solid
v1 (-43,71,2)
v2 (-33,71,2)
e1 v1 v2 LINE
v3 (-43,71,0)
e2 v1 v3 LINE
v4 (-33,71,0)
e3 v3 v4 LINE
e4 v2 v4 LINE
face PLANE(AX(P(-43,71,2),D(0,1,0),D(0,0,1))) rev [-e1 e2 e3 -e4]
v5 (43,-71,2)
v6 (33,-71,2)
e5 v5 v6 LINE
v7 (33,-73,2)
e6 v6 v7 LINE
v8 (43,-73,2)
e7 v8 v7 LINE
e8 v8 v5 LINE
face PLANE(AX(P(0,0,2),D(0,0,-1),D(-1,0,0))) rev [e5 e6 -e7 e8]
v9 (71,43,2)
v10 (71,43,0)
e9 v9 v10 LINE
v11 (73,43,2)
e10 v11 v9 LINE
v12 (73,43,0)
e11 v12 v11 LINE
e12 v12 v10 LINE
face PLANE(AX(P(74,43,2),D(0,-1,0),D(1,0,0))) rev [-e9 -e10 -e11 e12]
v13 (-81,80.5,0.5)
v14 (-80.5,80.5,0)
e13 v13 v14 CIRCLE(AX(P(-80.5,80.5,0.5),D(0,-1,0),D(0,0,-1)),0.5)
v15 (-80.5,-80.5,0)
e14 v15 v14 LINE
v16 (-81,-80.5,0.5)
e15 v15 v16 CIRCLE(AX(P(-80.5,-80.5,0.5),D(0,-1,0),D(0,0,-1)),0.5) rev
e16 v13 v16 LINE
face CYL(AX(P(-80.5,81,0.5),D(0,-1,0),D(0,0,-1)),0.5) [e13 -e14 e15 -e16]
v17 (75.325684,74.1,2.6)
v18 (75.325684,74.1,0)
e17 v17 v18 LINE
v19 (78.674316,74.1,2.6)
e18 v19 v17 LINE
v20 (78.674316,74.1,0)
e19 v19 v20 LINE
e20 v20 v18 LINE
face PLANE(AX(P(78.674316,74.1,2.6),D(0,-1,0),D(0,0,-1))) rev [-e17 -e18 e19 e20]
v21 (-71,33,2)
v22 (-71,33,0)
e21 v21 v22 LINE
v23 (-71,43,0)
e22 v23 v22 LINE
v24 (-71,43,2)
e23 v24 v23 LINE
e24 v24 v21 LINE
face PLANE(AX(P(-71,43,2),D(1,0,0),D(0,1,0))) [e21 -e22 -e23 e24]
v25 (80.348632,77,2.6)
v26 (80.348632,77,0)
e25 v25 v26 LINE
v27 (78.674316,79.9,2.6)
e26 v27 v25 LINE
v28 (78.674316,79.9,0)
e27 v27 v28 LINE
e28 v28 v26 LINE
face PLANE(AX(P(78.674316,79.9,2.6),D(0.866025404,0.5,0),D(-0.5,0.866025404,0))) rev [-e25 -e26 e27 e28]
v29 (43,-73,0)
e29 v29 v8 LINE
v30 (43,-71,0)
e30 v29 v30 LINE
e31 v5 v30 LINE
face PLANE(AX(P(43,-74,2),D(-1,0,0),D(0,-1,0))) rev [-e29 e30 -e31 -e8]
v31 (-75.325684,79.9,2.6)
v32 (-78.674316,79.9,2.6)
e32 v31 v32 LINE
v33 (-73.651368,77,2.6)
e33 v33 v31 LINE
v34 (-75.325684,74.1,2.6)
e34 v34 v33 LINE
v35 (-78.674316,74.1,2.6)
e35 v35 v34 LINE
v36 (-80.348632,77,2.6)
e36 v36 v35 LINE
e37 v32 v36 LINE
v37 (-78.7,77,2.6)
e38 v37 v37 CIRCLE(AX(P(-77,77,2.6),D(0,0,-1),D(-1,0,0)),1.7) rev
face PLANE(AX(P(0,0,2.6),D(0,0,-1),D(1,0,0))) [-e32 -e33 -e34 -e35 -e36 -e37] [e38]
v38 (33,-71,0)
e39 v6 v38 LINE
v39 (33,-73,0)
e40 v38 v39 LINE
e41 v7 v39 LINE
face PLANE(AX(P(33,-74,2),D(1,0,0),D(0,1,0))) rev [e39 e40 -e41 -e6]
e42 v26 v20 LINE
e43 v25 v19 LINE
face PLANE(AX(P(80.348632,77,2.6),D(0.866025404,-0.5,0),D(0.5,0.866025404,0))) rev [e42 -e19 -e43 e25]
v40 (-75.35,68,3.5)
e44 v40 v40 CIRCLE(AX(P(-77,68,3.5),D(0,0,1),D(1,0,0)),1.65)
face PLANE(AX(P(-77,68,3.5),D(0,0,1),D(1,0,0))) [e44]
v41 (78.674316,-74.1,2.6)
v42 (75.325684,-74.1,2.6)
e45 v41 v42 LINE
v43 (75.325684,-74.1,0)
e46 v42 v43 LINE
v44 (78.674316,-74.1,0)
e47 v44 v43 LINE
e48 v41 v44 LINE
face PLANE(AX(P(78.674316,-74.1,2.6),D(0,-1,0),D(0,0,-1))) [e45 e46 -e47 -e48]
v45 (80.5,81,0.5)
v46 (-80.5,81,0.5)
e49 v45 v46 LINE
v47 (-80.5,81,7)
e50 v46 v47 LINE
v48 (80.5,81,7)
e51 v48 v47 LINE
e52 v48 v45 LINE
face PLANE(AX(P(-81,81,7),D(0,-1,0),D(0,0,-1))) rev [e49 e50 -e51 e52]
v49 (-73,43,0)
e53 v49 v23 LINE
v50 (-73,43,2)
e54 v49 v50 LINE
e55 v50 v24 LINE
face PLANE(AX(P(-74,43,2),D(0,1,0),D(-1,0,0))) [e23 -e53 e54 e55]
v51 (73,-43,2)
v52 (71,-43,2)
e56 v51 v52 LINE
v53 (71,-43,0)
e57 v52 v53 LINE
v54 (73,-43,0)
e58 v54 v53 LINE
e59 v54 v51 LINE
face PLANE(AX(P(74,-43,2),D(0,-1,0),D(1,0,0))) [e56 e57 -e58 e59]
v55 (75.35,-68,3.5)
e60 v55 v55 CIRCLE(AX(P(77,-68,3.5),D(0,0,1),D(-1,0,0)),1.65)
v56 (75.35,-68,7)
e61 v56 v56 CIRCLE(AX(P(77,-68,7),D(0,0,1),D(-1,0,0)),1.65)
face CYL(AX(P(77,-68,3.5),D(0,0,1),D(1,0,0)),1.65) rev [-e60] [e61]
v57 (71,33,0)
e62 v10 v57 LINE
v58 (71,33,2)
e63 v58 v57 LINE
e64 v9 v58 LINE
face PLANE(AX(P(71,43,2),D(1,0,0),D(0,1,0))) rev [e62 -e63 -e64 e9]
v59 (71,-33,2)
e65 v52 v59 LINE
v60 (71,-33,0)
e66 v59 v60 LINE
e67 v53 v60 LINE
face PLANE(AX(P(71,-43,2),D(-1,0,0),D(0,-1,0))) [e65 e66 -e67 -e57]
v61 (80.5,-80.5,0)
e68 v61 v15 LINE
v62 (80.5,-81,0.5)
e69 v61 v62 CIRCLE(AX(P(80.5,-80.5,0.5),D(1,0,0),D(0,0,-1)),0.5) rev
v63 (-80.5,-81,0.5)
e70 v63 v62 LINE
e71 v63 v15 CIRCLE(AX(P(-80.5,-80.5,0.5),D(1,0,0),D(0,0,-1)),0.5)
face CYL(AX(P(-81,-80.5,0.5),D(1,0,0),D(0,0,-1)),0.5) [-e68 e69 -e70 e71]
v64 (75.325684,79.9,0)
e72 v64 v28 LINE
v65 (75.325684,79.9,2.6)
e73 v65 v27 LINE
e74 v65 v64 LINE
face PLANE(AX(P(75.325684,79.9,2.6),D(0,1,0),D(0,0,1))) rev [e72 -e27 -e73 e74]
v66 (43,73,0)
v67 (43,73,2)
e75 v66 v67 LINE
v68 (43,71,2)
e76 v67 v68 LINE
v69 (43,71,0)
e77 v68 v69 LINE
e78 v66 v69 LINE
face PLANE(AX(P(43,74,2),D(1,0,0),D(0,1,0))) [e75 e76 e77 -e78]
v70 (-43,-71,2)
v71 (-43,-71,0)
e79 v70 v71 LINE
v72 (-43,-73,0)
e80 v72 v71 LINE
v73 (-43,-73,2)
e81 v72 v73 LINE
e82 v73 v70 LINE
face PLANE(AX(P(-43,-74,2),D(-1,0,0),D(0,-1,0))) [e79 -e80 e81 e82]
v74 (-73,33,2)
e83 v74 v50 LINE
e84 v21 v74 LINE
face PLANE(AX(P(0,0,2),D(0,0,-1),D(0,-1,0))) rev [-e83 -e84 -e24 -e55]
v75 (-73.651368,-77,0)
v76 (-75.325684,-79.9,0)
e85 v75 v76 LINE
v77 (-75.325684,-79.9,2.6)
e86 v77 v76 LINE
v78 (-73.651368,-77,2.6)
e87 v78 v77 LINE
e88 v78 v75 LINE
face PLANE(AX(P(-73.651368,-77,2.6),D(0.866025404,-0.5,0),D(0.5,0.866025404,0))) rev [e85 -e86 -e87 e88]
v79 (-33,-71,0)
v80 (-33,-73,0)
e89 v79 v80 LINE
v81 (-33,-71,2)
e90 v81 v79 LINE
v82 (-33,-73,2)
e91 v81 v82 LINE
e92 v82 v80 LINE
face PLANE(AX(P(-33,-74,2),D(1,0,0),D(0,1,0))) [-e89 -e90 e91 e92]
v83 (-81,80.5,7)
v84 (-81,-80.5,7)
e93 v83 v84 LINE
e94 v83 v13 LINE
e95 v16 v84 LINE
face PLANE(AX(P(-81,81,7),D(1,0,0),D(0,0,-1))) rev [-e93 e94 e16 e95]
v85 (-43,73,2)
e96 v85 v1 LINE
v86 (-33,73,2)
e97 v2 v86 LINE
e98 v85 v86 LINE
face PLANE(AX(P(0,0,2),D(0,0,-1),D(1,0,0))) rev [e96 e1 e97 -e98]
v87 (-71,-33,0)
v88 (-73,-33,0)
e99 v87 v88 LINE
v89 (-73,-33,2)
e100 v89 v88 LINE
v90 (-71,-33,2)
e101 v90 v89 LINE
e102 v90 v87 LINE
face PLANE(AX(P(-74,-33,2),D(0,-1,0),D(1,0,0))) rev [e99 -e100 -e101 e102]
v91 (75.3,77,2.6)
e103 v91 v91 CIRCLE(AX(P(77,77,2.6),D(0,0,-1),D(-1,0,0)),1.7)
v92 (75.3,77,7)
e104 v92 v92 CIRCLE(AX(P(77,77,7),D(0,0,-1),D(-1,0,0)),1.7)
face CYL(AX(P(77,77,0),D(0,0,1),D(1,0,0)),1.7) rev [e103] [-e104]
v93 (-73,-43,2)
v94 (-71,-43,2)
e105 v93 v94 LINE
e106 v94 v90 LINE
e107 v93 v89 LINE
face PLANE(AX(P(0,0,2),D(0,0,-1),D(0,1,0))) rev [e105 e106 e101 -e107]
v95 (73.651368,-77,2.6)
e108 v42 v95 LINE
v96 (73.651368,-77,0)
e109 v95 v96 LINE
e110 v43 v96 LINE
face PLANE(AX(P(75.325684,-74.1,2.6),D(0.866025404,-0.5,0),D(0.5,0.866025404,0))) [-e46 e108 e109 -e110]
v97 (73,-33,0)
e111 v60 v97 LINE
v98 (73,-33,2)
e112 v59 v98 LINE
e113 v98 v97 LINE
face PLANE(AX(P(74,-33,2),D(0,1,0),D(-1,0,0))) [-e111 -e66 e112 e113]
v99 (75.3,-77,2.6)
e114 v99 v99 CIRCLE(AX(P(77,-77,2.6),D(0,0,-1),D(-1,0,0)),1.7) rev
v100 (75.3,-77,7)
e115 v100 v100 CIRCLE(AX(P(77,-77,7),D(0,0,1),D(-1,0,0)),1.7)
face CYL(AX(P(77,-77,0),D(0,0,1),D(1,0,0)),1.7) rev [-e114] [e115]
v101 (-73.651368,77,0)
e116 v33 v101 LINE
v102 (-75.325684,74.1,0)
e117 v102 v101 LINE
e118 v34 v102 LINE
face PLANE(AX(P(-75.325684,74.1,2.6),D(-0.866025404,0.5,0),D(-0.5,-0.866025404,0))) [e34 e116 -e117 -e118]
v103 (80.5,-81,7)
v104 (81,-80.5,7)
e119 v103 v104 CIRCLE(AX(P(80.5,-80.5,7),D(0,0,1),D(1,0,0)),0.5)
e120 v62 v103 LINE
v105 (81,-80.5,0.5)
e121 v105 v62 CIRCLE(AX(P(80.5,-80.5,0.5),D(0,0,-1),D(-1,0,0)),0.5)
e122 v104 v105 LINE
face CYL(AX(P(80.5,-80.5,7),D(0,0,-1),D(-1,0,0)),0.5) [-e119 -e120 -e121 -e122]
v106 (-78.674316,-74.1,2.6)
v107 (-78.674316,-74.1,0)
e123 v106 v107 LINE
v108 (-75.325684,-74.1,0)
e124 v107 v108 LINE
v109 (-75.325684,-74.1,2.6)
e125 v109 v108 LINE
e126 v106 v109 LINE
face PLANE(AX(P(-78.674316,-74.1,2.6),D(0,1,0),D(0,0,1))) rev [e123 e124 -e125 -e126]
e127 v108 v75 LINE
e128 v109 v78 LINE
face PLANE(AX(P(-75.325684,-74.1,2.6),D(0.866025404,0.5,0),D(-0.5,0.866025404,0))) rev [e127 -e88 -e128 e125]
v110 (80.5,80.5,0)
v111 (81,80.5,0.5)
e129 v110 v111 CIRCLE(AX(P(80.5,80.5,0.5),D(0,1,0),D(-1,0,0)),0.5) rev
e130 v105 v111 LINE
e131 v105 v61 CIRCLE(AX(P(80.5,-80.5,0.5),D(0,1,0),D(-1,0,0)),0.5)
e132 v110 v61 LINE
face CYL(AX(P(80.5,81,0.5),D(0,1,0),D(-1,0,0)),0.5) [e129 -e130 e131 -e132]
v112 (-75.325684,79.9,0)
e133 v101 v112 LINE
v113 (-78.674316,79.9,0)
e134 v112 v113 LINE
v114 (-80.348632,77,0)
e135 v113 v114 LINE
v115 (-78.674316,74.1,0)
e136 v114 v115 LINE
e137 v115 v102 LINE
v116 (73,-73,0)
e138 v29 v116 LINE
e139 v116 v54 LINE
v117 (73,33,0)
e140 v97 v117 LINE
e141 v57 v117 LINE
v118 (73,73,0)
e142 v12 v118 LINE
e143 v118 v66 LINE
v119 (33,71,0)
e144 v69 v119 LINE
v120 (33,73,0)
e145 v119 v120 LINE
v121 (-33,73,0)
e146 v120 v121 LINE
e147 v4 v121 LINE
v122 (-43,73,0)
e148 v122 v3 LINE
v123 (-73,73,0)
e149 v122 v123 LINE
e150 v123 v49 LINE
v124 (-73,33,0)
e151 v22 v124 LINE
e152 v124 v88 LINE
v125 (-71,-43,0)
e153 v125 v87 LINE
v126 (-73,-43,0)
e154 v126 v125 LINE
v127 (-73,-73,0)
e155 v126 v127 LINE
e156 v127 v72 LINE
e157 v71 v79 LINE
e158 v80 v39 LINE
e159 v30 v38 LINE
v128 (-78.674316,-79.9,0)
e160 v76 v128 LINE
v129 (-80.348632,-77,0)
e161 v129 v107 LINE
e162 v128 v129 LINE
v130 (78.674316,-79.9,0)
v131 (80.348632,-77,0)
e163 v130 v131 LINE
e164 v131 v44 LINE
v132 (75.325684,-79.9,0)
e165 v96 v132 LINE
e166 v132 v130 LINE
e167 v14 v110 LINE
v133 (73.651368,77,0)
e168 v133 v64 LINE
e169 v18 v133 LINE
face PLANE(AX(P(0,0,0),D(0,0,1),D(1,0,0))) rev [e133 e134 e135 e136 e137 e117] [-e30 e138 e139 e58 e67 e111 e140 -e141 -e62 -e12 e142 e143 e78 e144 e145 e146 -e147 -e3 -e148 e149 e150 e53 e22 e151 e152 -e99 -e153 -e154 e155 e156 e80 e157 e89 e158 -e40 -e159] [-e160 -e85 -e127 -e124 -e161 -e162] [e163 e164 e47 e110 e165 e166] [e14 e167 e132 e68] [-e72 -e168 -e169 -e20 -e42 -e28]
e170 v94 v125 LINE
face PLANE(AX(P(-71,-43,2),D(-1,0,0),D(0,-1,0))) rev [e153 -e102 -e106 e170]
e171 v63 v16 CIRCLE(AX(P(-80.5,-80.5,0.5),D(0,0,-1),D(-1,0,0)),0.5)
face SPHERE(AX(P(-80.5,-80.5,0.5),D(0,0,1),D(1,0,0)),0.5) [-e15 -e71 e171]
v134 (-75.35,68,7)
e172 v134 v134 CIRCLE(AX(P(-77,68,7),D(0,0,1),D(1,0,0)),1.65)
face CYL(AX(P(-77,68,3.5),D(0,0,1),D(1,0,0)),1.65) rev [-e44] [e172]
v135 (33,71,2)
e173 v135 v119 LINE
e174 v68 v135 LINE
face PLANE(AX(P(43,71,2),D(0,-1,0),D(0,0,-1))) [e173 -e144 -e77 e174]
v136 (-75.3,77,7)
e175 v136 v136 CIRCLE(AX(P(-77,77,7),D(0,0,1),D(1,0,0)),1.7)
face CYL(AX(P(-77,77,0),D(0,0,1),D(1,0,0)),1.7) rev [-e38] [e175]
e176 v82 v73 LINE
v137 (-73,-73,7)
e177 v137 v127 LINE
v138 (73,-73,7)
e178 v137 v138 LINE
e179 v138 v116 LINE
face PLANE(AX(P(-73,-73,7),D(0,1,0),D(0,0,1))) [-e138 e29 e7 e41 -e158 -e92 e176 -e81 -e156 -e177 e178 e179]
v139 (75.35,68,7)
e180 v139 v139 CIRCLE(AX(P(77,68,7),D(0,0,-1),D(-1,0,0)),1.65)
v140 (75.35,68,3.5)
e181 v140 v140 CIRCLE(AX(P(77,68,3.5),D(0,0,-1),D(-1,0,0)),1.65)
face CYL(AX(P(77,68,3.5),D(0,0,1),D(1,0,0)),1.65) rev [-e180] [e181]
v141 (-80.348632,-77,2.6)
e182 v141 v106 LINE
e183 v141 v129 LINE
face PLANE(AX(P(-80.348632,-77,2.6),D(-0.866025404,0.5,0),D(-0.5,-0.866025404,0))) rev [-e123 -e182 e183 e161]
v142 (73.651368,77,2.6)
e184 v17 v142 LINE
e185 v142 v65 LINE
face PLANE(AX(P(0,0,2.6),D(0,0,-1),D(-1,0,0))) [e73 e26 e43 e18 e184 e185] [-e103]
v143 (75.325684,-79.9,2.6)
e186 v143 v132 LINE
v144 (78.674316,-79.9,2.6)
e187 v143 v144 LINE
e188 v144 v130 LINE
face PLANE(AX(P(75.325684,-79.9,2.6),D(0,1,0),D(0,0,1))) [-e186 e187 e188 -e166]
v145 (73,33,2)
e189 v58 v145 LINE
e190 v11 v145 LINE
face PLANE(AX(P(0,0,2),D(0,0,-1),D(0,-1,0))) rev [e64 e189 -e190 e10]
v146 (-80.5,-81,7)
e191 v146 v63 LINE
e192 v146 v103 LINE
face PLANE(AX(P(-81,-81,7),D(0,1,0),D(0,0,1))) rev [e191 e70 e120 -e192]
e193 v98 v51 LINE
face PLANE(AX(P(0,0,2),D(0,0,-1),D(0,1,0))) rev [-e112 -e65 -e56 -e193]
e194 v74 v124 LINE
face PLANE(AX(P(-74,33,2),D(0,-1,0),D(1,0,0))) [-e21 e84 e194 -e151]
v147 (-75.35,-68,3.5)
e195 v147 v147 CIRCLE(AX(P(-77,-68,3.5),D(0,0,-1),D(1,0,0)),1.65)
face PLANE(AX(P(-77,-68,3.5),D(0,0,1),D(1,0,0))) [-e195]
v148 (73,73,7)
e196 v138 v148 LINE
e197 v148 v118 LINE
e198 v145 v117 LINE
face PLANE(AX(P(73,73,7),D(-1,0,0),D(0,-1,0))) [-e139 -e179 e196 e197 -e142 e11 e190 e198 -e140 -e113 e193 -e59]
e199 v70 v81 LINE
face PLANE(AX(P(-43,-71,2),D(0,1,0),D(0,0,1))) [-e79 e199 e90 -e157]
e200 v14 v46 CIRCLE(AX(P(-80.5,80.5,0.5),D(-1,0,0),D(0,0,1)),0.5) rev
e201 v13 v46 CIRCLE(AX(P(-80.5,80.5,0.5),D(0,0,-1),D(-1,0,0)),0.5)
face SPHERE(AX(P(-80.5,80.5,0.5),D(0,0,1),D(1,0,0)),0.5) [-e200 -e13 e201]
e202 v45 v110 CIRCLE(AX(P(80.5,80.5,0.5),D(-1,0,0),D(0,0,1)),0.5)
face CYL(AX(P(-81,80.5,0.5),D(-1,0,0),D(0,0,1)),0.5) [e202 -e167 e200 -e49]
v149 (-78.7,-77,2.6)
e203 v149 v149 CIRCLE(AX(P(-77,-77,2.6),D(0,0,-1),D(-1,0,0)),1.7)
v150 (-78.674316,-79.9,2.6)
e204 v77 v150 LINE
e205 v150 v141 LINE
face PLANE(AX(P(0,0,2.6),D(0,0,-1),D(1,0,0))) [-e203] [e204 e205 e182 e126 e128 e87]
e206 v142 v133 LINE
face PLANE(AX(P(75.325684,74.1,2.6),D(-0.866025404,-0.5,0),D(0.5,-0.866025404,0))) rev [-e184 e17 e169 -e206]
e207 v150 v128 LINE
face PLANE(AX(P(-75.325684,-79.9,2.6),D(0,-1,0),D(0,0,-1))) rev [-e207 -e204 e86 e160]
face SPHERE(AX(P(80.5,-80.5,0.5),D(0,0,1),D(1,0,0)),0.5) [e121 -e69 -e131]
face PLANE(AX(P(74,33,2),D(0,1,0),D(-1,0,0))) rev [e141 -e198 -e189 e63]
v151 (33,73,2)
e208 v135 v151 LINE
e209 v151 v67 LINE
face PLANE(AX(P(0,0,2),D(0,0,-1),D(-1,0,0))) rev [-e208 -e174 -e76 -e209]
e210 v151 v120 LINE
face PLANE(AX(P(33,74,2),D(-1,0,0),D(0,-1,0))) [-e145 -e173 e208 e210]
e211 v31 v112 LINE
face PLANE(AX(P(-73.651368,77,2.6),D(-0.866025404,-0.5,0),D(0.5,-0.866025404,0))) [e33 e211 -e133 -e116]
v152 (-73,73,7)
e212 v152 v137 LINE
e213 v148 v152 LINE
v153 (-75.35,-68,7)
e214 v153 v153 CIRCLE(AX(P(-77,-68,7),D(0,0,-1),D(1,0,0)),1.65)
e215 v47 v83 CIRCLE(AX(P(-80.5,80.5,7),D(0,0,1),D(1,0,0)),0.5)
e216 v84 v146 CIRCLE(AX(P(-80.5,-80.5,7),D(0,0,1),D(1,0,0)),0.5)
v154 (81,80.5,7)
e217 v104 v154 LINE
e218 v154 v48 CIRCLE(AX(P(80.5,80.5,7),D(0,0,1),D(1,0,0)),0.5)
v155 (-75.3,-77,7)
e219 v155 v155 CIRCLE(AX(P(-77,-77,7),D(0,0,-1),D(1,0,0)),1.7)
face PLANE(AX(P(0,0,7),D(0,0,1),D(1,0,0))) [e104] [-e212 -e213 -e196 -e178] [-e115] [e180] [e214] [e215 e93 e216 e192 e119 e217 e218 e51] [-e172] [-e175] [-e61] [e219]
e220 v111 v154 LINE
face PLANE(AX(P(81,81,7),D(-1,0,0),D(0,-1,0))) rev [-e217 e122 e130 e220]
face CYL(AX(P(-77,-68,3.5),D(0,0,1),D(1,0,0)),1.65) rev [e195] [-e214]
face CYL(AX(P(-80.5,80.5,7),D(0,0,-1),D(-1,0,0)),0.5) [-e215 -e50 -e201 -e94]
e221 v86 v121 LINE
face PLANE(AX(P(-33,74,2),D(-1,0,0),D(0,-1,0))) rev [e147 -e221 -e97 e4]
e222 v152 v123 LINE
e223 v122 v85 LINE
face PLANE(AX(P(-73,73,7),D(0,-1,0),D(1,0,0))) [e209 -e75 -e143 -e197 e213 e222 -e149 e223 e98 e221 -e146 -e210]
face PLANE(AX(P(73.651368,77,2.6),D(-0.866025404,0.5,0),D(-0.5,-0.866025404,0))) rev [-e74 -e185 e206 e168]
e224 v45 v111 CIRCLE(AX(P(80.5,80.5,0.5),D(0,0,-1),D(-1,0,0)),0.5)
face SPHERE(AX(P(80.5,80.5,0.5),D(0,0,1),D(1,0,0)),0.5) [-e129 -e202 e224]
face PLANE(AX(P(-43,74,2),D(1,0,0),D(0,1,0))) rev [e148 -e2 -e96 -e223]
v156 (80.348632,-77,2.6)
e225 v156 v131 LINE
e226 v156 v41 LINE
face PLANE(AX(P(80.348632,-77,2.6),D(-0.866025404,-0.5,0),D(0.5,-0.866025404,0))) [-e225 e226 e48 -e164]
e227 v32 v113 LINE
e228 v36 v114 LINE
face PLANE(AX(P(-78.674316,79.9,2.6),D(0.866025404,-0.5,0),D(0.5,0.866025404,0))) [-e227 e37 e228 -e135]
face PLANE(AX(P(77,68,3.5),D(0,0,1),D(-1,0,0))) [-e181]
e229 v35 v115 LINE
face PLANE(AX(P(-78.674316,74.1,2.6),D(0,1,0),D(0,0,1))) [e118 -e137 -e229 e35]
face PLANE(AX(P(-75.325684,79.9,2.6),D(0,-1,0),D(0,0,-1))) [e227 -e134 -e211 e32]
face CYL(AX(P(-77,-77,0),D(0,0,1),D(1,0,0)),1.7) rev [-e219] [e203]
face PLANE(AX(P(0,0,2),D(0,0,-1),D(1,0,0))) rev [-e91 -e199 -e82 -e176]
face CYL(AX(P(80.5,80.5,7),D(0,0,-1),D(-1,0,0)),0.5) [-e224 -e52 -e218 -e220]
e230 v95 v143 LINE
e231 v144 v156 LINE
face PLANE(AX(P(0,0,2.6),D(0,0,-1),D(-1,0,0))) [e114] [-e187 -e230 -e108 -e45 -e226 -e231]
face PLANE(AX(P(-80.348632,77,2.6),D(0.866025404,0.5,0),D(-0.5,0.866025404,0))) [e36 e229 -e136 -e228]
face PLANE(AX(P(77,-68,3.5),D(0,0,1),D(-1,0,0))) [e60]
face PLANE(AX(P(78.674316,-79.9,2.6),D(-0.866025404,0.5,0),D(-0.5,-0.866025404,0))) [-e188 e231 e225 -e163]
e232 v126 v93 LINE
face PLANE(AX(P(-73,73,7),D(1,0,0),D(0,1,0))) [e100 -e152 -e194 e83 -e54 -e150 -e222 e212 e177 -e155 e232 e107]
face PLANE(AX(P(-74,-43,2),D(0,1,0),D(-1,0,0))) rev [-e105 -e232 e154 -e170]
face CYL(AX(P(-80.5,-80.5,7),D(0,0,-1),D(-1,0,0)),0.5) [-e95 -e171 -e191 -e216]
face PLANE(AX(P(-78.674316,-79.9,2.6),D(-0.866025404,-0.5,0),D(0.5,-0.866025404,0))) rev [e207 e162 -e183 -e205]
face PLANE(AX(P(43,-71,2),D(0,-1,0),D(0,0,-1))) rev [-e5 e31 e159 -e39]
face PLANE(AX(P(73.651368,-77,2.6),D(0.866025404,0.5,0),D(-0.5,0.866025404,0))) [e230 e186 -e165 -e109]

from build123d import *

# Parameters (mm, degrees)
SKETCH_1_W                                   = 162
SKETCH_1_H                                   = 162
SKETCH_1_W_2                                 = 146
SKETCH_1_H_2                                 = 146
EXTRUDE_375_DEPTH                            = 7
SKETCH_2_W                                   = 10
SKETCH_2_H                                   = 3
EXTRUDE_670_DEPTH                            = 2
PATTERN_CIRCULAR_761_COUNT                   = 4
PATTERN_CIRCULAR_761_COPY_1_SKETCH_W         = 10
PATTERN_CIRCULAR_761_COPY_1_SKETCH_H         = 3
PATTERN_CIRCULAR_761_COPY_1_DEPTH            = 2
PATTERN_CIRCULAR_761_COPY_2_SKETCH_W         = 10
PATTERN_CIRCULAR_761_COPY_2_SKETCH_H         = 3
PATTERN_CIRCULAR_761_COPY_2_DEPTH            = 2
PATTERN_CIRCULAR_761_COPY_3_SKETCH_W         = 10
PATTERN_CIRCULAR_761_COPY_3_SKETCH_H         = 3
PATTERN_CIRCULAR_761_COPY_3_DEPTH            = 2
SKETCH_3_R                                   = 1.7
CUT_EXTRUDE_1047_DEPTH                       = 115.764977236
MIRROR_1214_COPY_1_SKETCH_R                  = 1.7
MIRROR_1214_COPY_1_DEPTH                     = 115.764977236
SKETCH_4_R                                   = 1.65
CUT_EXTRUDE_1505_DEPTH                       = 3.5
MIRROR_1637_COPY_1_SKETCH_R                  = 1.65
MIRROR_1637_COPY_1_DEPTH                     = 3.5
CUT_EXTRUDE_2611_DEPTH                       = 2.6
MIRROR_2701_AT_THE_SECOND_PLANE_COPY_1_DEPTH = 2.6
FILLET_1_R                                   = 0.5
FILLET_2_R                                   = 0.5


with BuildPart() as part:
    # Эскиз1 → Extrude 375 (new body)
    with BuildSketch(Plane.XY):
        Rectangle(SKETCH_1_W, SKETCH_1_H)
        Rectangle(SKETCH_1_W_2, SKETCH_1_H_2, mode=Mode.SUBTRACT)
    extrude(amount=EXTRUDE_375_DEPTH)

    # Эскиз2 → Extrude 670 (add)
    with BuildSketch(Plane(origin=(0, 0, 0), x_dir=(-1, 0, 0), z_dir=(0, 0, -1))):
        with Locations((-38, 72.5)):
            Rectangle(SKETCH_2_W, SKETCH_2_H)
    extrude_670 = extrude(amount=-EXTRUDE_670_DEPTH)

    # Mirror 726: Extrude 670 across plane
    add(extrude_670.mirror(Plane(origin=(0, 0, 0), x_dir=(0, 0, 1), z_dir=(1, 0, 0))))

    # Pattern Circular 761: Extrude 670 ×4 about axis
    pattern_circular_761_axis = Axis((0, 0, 0), (0, 0, 1))
    for i in range(1, PATTERN_CIRCULAR_761_COUNT):
        add(extrude_670.rotate(pattern_circular_761_axis, i * 360 / PATTERN_CIRCULAR_761_COUNT))

    # Pattern Circular 761 copy 1 sketch → Pattern Circular 761 copy 1 (add)
    with BuildSketch(Plane.YX):
        with Locations((-38, -72.5)):
            Rectangle(PATTERN_CIRCULAR_761_COPY_1_SKETCH_W, PATTERN_CIRCULAR_761_COPY_1_SKETCH_H)
    extrude(amount=-PATTERN_CIRCULAR_761_COPY_1_DEPTH)

    # Pattern Circular 761 copy 2 sketch → Pattern Circular 761 copy 2 (add)
    with BuildSketch(Plane(origin=(0, 0, 0), x_dir=(-1, 0, 0), z_dir=(0, 0, -1))):
        with Locations((-38, -72.5)):
            Rectangle(PATTERN_CIRCULAR_761_COPY_2_SKETCH_W, PATTERN_CIRCULAR_761_COPY_2_SKETCH_H)
    extrude(amount=-PATTERN_CIRCULAR_761_COPY_2_DEPTH)

    # Pattern Circular 761 copy 3 sketch → Pattern Circular 761 copy 3 (add)
    with BuildSketch(Plane(origin=(0, 0, 0), x_dir=(0, -1, 0), z_dir=(0, 0, -1))):
        with Locations((-38, -72.5)):
            Rectangle(PATTERN_CIRCULAR_761_COPY_3_SKETCH_W, PATTERN_CIRCULAR_761_COPY_3_SKETCH_H)
    extrude(amount=-PATTERN_CIRCULAR_761_COPY_3_DEPTH)

    # Эскиз3 → Cut-Extrude 1047 (cut, through all)
    with BuildSketch(Plane.XY.offset(7)):
        with Locations((-77, 77)):
            Circle(SKETCH_3_R)
    cut_extrude_1047 = extrude(amount=-CUT_EXTRUDE_1047_DEPTH, mode=Mode.SUBTRACT)

    # Mirror 1158: Cut-Extrude 1047 across plane
    add(cut_extrude_1047.mirror(Plane(origin=(0, 0, 0), x_dir=(0, 0, 1), z_dir=(1, 0, 0))), mode=Mode.SUBTRACT)

    # Mirror 1214: Cut-Extrude 1047 across plane
    add(cut_extrude_1047.mirror(Plane.ZX), mode=Mode.SUBTRACT)

    # Mirror 1214 copy 1 sketch → Mirror 1214 copy 1 (cut, through all)
    with BuildSketch(Plane(origin=(0, 0, 7), x_dir=(-1, 0, 0), z_dir=(0, 0, 1))):
        with Locations((-77, 77)):
            Circle(MIRROR_1214_COPY_1_SKETCH_R)
    extrude(amount=-MIRROR_1214_COPY_1_DEPTH, mode=Mode.SUBTRACT)

    # Эскиз4 → Cut-Extrude 1505 (cut)
    with BuildSketch(Plane.XY.offset(7)):
        with Locations((-77, 68)):
            Circle(SKETCH_4_R)
    cut_extrude_1505 = extrude(amount=-CUT_EXTRUDE_1505_DEPTH, mode=Mode.SUBTRACT)

    # Mirror 1581: Cut-Extrude 1505 across plane
    add(cut_extrude_1505.mirror(Plane(origin=(0, 0, 0), x_dir=(0, 0, 1), z_dir=(1, 0, 0))), mode=Mode.SUBTRACT)

    # Mirror 1637: Cut-Extrude 1505 across plane
    add(cut_extrude_1505.mirror(Plane.ZX), mode=Mode.SUBTRACT)

    # Mirror 1637 copy 1 sketch → Mirror 1637 copy 1 (cut)
    with BuildSketch(Plane(origin=(0, 0, 7), x_dir=(-1, 0, 0), z_dir=(0, 0, 1))):
        with Locations((-77, 68)):
            Circle(MIRROR_1637_COPY_1_SKETCH_R)
    extrude(amount=-MIRROR_1637_COPY_1_DEPTH, mode=Mode.SUBTRACT)

    # Эскиз5 → Cut-Extrude 2611 (cut)
    with BuildSketch(Plane(origin=(0, 0, 0), x_dir=(-1, 0, 0), z_dir=(0, 0, -1))):
        Polygon((-73.651368439, 77), (-75.325684219, 79.9), (-78.674315781, 79.9), (-80.348631561, 77), (-78.674315781, 74.1), (-75.325684219, 74.1), align=None)
    cut_extrude_2611 = extrude(amount=-CUT_EXTRUDE_2611_DEPTH, mode=Mode.SUBTRACT)

    # Mirror 2701: Cut-Extrude 2611 across plane
    add(cut_extrude_2611.mirror(Plane(origin=(0, 0, 0), x_dir=(0, 0, 1), z_dir=(1, 0, 0))), mode=Mode.SUBTRACT)

    # Mirror 2701 at the second plane: Cut-Extrude 2611 across plane
    add(cut_extrude_2611.mirror(Plane.ZX), mode=Mode.SUBTRACT)

    # Mirror 2701 at the second plane copy 1 s → Mirror 2701 at the second plane copy 1 (cut)
    with BuildSketch(Plane(origin=(0, 0, 0), x_dir=(1, 0, 0), z_dir=(0, 0, -1))):
        Polygon((-73.651368439, 77), (-75.325684219, 79.9), (-78.674315781, 79.9), (-80.348631561, 77), (-78.674315781, 74.1), (-75.325684219, 74.1), align=None)
    extrude(amount=-MIRROR_2701_AT_THE_SECOND_PLANE_COPY_1_DEPTH, mode=Mode.SUBTRACT)

    # Скругление1
    fillet_1_edges = [part.edges().sort_by_distance(p)[0] for p in [
        (0, -81, 0),
        (-81, 0, 0),
        (0, 81, 0),
        (81, 0, 0),
    ]]
    fillet(fillet_1_edges, radius=FILLET_1_R)

    # Скругление2
    # the kernel refuses this fillet: 0.5 mm, written as the material it takes off along each edge
    with BuildSketch(Plane(origin=(-80.5, 80.5, 0.5), x_dir=(-1, 0, 0), z_dir=(0, 1, 0))) as fillet_2_piece_1_section:
        Polygon((0, 0), (FILLET_2_R, 0), (FILLET_2_R, -FILLET_2_R), (0, -FILLET_2_R), align=None)
    fillet_2_piece_1 = extrude(amount=FILLET_2_R, mode=Mode.PRIVATE)
    fillet_2_piece_1 = fillet_2_piece_1 - Plane(origin=(-80.5, 80.5, 0.5), x_dir=(0.7071067811865475, 0, 0.7071067811865475), z_dir=(0, 1, 0)) * Sphere(FILLET_2_R, mode=Mode.PRIVATE)
    add(fillet_2_piece_1, mode=Mode.SUBTRACT)
    with BuildSketch(Plane(origin=(80.5, 80.5, 0.5), x_dir=(1, 0, 0), z_dir=(0, 1, 0))) as fillet_2_piece_2_section:
        Polygon((0, 0), (FILLET_2_R, 0), (FILLET_2_R, FILLET_2_R), (0, FILLET_2_R), align=None)
    fillet_2_piece_2 = extrude(amount=FILLET_2_R, mode=Mode.PRIVATE)
    fillet_2_piece_2 = fillet_2_piece_2 - Plane(origin=(80.5, 80.5, 0.5), x_dir=(-0.7071067811865475, 0, 0.7071067811865475), z_dir=(0, 1, 0)) * Sphere(FILLET_2_R, mode=Mode.PRIVATE)
    add(fillet_2_piece_2, mode=Mode.SUBTRACT)
    with BuildSketch(Plane(origin=(-80.5, -80.5, 0.5), x_dir=(0, -1, 0), z_dir=(-1, 0, 0))) as fillet_2_piece_3_section:
        Polygon((0, 0), (FILLET_2_R, 0), (FILLET_2_R, -FILLET_2_R), (0, -FILLET_2_R), align=None)
    fillet_2_piece_3 = extrude(amount=FILLET_2_R, mode=Mode.PRIVATE)
    fillet_2_piece_3 = fillet_2_piece_3 - Plane(origin=(-80.5, -80.5, 0.5), x_dir=(0, 0.7071067811865475, 0.7071067811865475), z_dir=(-1, 0, 0)) * Sphere(FILLET_2_R, mode=Mode.PRIVATE)
    add(fillet_2_piece_3, mode=Mode.SUBTRACT)
    with BuildSketch(Plane(origin=(80.5, -80.5, 0.5), x_dir=(0, -1, 0), z_dir=(1, 0, 0))) as fillet_2_piece_4_section:
        Polygon((0, 0), (FILLET_2_R, 0), (FILLET_2_R, FILLET_2_R), (0, FILLET_2_R), align=None)
    fillet_2_piece_4 = extrude(amount=FILLET_2_R, mode=Mode.PRIVATE)
    fillet_2_piece_4 = fillet_2_piece_4 - Plane(origin=(80.5, -80.5, 0.5), x_dir=(0, 0.7071067811865475, 0.7071067811865475), z_dir=(1, 0, 0)) * Sphere(FILLET_2_R, mode=Mode.PRIVATE)
    add(fillet_2_piece_4, mode=Mode.SUBTRACT)
    with BuildSketch(Plane(origin=(81, -81, 0.5), x_dir=(0, 1, 0), z_dir=(0, 0, 1)), Plane(origin=(81, 81, 0.5), x_dir=(-1, 0, 0), z_dir=(0, 0, 1))) as fillet_2_piece_5:
        with BuildLine():
            CenterArc((FILLET_2_R, FILLET_2_R), FILLET_2_R, 180, 90)
            Line((0, FILLET_2_R), (0, 0))
            Line((0, 0), (FILLET_2_R, 0))
        make_face()
    extrude(amount=7.75, mode=Mode.SUBTRACT)
    with BuildSketch(Plane(origin=(-81, -81, 0.5), x_dir=(0, 1, 0), z_dir=(0, 0, 1)), Plane(origin=(-81, 81, 0.5), x_dir=(1, 0, 0), z_dir=(0, 0, 1))) as fillet_2_piece_6:
        with BuildLine():
            CenterArc((FILLET_2_R, -FILLET_2_R), FILLET_2_R, 90, 90)
            Line((0, -FILLET_2_R), (0, 0))
            Line((0, 0), (FILLET_2_R, 0))
        make_face()
    extrude(amount=7.75, mode=Mode.SUBTRACT)


solid = part.part
